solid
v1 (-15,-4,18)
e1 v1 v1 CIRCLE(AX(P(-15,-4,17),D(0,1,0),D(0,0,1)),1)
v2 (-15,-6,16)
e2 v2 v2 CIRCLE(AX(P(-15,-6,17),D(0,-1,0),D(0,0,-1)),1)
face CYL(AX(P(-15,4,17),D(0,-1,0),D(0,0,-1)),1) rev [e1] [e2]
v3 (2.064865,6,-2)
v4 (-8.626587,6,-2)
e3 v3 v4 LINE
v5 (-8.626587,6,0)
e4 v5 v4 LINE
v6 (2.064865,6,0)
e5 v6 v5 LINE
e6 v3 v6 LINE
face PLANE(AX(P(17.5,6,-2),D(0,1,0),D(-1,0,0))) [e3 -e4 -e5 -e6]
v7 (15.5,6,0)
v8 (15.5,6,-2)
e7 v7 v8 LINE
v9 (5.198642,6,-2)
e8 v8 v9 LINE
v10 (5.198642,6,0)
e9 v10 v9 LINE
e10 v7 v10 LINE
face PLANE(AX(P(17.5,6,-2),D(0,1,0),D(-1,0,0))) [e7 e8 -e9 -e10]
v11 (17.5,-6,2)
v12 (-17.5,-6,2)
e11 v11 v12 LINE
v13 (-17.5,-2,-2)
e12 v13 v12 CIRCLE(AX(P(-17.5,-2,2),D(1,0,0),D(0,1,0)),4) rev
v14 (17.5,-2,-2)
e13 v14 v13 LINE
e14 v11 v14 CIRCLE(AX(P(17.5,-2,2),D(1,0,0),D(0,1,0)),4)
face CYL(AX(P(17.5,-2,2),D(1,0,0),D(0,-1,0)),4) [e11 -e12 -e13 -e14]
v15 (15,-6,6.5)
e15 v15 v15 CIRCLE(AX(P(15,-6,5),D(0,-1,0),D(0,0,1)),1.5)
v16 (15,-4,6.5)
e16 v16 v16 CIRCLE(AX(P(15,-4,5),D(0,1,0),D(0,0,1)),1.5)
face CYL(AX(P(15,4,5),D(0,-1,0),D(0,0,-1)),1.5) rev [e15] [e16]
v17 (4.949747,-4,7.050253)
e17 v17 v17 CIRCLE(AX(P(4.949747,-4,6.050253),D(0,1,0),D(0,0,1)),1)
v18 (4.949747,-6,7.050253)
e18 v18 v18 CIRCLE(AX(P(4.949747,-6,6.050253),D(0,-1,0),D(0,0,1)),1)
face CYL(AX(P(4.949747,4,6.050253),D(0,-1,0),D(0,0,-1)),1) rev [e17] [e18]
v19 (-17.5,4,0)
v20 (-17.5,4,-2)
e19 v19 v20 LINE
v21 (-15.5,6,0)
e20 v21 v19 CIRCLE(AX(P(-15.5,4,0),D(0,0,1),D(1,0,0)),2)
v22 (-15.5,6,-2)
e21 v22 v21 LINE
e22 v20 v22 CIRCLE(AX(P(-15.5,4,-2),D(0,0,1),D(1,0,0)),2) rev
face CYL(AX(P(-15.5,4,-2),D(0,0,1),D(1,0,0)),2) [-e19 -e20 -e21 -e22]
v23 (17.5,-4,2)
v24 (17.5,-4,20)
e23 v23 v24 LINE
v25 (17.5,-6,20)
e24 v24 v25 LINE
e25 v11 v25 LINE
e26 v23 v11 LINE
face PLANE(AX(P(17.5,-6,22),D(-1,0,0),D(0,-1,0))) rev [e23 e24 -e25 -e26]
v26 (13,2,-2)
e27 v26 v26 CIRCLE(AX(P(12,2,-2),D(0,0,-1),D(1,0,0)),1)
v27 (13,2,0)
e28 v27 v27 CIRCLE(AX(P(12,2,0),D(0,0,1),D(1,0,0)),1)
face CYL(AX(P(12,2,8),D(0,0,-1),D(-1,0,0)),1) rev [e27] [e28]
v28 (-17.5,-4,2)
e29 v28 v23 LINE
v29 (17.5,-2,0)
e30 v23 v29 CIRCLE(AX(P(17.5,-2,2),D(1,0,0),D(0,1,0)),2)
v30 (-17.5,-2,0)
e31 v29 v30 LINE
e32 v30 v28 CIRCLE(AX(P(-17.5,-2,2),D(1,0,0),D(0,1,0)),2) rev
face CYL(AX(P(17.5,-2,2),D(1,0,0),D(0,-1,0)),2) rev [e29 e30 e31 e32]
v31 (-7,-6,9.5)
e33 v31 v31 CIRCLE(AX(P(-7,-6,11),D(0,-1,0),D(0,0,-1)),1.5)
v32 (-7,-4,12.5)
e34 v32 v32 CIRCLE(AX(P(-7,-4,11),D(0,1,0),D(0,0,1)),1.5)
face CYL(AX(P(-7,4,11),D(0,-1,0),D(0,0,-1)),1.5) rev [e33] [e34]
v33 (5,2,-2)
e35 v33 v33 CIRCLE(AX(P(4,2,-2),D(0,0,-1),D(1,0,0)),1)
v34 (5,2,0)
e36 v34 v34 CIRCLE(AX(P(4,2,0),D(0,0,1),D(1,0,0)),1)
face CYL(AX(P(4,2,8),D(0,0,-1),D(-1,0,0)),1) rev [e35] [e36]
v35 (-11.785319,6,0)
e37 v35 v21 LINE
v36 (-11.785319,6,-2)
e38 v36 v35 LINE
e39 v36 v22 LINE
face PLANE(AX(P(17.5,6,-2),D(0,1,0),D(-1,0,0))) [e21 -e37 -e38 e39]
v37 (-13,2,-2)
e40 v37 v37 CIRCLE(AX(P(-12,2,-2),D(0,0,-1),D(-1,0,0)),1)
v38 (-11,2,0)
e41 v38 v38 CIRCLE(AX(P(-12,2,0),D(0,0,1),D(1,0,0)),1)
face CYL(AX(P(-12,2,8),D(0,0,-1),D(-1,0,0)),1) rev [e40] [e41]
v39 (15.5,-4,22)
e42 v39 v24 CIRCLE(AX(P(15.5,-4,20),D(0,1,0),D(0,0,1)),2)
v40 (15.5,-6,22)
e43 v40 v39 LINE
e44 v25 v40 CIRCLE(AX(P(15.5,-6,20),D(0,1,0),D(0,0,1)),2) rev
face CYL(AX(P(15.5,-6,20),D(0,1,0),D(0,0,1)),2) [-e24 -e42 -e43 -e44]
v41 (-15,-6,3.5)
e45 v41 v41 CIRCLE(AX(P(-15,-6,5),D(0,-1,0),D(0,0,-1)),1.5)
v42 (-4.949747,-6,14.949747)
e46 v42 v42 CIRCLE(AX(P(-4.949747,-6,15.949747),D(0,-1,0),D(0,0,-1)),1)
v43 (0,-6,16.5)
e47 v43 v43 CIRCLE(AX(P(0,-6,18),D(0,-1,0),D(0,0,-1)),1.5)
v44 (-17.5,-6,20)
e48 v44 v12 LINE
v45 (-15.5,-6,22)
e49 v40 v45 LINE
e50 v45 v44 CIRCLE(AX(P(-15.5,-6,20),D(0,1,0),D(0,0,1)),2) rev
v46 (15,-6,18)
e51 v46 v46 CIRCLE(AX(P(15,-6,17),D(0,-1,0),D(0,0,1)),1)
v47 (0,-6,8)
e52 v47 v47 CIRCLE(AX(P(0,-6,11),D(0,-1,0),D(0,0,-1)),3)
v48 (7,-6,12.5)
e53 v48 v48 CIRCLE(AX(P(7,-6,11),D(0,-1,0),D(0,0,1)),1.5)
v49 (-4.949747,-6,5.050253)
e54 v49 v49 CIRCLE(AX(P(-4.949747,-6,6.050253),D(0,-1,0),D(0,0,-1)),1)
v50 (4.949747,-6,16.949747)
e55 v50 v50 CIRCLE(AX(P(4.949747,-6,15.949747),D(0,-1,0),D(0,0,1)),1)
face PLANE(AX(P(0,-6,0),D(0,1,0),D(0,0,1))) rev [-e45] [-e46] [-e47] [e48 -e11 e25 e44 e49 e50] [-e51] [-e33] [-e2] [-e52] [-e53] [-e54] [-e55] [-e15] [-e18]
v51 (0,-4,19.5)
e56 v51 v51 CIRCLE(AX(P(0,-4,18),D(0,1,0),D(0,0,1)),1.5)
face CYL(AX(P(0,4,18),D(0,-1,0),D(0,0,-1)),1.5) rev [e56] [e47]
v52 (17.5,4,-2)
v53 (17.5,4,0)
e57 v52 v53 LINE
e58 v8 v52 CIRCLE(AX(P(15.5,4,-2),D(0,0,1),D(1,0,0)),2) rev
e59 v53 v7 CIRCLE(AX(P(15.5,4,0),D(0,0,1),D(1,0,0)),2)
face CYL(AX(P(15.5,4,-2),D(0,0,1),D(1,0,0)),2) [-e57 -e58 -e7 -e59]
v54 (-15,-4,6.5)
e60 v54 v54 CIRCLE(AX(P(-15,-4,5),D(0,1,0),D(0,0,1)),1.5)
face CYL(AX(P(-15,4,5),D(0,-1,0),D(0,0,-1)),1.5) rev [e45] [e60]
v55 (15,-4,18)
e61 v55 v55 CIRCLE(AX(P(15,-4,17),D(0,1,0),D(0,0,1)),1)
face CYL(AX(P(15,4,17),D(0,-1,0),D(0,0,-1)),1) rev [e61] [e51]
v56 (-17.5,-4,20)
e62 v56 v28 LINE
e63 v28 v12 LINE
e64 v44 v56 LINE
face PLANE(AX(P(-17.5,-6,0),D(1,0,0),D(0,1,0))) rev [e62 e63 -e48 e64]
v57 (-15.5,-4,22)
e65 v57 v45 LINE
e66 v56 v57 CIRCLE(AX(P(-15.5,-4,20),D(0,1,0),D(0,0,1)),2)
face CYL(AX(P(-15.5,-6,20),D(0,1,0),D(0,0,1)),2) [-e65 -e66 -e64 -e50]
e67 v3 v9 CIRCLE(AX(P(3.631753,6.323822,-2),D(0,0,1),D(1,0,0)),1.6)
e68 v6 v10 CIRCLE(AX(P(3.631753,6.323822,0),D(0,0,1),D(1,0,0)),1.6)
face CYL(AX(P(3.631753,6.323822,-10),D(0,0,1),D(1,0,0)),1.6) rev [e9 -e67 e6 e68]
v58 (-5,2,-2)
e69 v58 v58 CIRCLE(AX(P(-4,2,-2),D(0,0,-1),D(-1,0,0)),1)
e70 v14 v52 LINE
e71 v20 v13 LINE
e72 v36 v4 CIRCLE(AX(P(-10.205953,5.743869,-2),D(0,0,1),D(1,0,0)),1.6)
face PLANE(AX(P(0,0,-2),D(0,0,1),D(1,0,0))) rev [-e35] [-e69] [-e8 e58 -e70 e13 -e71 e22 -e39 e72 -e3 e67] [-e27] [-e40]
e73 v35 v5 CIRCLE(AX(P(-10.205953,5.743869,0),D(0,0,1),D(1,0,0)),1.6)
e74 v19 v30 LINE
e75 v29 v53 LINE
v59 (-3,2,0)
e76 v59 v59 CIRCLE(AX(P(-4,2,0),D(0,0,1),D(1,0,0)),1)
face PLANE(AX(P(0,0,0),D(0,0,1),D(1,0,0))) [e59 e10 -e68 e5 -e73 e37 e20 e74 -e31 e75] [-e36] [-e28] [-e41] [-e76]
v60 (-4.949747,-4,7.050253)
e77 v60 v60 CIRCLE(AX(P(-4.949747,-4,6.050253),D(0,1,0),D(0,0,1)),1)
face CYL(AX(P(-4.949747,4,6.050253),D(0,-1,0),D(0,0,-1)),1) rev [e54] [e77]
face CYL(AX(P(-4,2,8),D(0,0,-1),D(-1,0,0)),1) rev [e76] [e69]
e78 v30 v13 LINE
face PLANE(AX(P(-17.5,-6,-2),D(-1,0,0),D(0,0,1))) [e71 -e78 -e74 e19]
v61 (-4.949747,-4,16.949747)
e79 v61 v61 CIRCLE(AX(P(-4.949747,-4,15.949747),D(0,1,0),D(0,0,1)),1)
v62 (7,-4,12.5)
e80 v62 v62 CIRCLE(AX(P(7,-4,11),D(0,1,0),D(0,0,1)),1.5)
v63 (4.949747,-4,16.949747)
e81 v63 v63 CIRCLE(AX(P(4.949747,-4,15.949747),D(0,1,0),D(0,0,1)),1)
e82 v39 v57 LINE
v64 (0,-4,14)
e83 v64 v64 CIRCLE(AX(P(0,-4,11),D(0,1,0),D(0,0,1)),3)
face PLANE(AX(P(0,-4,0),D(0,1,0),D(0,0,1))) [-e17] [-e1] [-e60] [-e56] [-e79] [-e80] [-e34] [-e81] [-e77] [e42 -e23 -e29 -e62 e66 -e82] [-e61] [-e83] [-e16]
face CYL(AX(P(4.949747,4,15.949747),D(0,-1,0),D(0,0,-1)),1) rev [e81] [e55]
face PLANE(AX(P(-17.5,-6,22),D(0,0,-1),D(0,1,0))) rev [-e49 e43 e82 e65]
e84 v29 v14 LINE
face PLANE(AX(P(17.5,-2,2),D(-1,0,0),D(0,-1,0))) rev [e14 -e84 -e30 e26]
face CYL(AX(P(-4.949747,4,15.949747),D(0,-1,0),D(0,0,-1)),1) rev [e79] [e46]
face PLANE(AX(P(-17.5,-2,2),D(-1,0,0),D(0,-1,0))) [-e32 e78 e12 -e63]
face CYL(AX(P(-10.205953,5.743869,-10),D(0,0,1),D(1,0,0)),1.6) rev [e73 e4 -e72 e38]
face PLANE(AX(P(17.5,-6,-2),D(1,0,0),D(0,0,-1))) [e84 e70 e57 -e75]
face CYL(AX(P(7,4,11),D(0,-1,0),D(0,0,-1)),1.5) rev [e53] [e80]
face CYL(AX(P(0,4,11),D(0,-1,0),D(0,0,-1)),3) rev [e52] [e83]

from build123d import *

# Parameters (mm, degrees)
SKETCH1_W                    = 35
SKETCH1_H                    = 12
BASE_FLANGE1_DEPTH           = 2
EDGE_FLANGE1_STRIP_W         = 12
EDGE_FLANGE1_STRIP_H         = 2
EDGE_FLANGE1_STRIP_CUT_DEPTH = 35
EDGE_FLANGE1_DEPTH           = 35
FILLET1_R                    = 2
SKETCH9_R                    = 1
CUT_EXTRUDE1_DEPTH           = 10
SKETCH10_R                   = 3
SKETCH10_R_2                 = 1.5
SKETCH10_R_3                 = 1
CUT_EXTRUDE2_DEPTH           = 10
SKETCH11_R                   = 1.6
CUT_EXTRUDE3_DEPTH           = 10


# Sheet-metal steps are written as plain solids
with BuildPart() as part:
    # Sketch1 → Base-Flange1 (new body)
    with BuildSketch(Plane.XY):
        Rectangle(SKETCH1_W, SKETCH1_H)
    extrude(amount=-BASE_FLANGE1_DEPTH)

    # Edge-Flange1 strip (across the edge) → Edge-Flange1 strip cut (cut)
    with BuildSketch(Plane(origin=(-17.5, -6, 0), x_dir=(0, 1, 0), z_dir=(1, 0, 0))):
        with Locations((-2, -1)):
            Rectangle(EDGE_FLANGE1_STRIP_W, EDGE_FLANGE1_STRIP_H)
    extrude(amount=EDGE_FLANGE1_STRIP_CUT_DEPTH, mode=Mode.SUBTRACT)

    # Edge-Flange1 section (across the edge) → Edge-Flange1 (add)
    with BuildSketch(Plane(origin=(-17.5, -6, 0), x_dir=(0, 1, 0), z_dir=(1, 0, 0))):
        with BuildLine():
            Line((0, 2), (0, 22))
            Line((0, 22), (2, 22))
            Line((2, 22), (2, 2))
            ThreePointArc((2, 2), (2.585786438, 0.585786438), (4, 0))
            Line((4, 0), (4, -2))
            ThreePointArc((4, -2), (1.171572875, -0.828427125), (0, 2))
        make_face()
    extrude(amount=EDGE_FLANGE1_DEPTH)

    # Fillet1
    fillet1_edges = [part.edges().sort_by_distance(p)[0] for p in [
        (-17.5, -5, 22),
        (17.5, -5, 22),
        (-17.5, 6, -1),
        (17.5, 6, -1),
    ]]
    fillet(fillet1_edges, radius=FILLET1_R)

    # Sketch9 → Cut-Extrude1 (cut)
    with BuildSketch(Plane(origin=(0, 0, -2), x_dir=(-1, 0, 0), z_dir=(0, 0, -1))):
        with Locations((4, 2)):
            Circle(SKETCH9_R)
        with Locations((12, 2)):
            Circle(SKETCH9_R)
        with Locations(Location((-12, 2, 0), (0, 0, 180))):
            Circle(SKETCH9_R)
        with Locations(Location((-4, 2, 0), (0, 0, 180))):
            Circle(SKETCH9_R)
    extrude(amount=-CUT_EXTRUDE1_DEPTH, mode=Mode.SUBTRACT)

    # Sketch10 → Cut-Extrude2 (cut)
    with BuildSketch(Plane.XZ.offset(6)):
        with Locations(Location((0, 11, 0), (0, 0, 270))):
            Circle(SKETCH10_R)
        with Locations(Location((-7, 11, 0), (0, 0, 270))):
            Circle(SKETCH10_R_2)
        with Locations(Location((-15, 5, 0), (0, 0, 270))):
            Circle(SKETCH10_R_2)
        with Locations(Location((-15, 17, 0), (0, 0, 270))):
            Circle(SKETCH10_R_3)
        with Locations(Location((-4.949747468, 15.949747468, 0), (0, 0, 270))):
            Circle(SKETCH10_R_3)
        with Locations(Location((-4.949747468, 6.050252532, 0), (0, 0, 270))):
            Circle(SKETCH10_R_3)
        with Locations(Location((0, 18, 0), (0, 0, 270))):
            Circle(SKETCH10_R_2)
        with Locations(Location((15, 17, 0), (0, 0, 90))):
            Circle(SKETCH10_R_3)
        with Locations(Location((15, 5, 0), (0, 0, 90))):
            Circle(SKETCH10_R_2)
        with Locations(Location((4.949747468, 6.050252532, 0), (0, 0, 90))):
            Circle(SKETCH10_R_3)
        with Locations(Location((7, 11, 0), (0, 0, 90))):
            Circle(SKETCH10_R_2)
        with Locations(Location((4.949747468, 15.949747468, 0), (0, 0, 90))):
            Circle(SKETCH10_R_3)
    extrude(amount=-CUT_EXTRUDE2_DEPTH, mode=Mode.SUBTRACT)

    # Sketch11 → Cut-Extrude3 (cut)
    with BuildSketch(Plane.XY):
        with Locations((-10.205953252, 5.743869118)):
            Circle(SKETCH11_R)
        with Locations((3.631753083, 6.323821502)):
            Circle(SKETCH11_R)
    extrude(amount=-CUT_EXTRUDE3_DEPTH, mode=Mode.SUBTRACT)


solid = part.part
